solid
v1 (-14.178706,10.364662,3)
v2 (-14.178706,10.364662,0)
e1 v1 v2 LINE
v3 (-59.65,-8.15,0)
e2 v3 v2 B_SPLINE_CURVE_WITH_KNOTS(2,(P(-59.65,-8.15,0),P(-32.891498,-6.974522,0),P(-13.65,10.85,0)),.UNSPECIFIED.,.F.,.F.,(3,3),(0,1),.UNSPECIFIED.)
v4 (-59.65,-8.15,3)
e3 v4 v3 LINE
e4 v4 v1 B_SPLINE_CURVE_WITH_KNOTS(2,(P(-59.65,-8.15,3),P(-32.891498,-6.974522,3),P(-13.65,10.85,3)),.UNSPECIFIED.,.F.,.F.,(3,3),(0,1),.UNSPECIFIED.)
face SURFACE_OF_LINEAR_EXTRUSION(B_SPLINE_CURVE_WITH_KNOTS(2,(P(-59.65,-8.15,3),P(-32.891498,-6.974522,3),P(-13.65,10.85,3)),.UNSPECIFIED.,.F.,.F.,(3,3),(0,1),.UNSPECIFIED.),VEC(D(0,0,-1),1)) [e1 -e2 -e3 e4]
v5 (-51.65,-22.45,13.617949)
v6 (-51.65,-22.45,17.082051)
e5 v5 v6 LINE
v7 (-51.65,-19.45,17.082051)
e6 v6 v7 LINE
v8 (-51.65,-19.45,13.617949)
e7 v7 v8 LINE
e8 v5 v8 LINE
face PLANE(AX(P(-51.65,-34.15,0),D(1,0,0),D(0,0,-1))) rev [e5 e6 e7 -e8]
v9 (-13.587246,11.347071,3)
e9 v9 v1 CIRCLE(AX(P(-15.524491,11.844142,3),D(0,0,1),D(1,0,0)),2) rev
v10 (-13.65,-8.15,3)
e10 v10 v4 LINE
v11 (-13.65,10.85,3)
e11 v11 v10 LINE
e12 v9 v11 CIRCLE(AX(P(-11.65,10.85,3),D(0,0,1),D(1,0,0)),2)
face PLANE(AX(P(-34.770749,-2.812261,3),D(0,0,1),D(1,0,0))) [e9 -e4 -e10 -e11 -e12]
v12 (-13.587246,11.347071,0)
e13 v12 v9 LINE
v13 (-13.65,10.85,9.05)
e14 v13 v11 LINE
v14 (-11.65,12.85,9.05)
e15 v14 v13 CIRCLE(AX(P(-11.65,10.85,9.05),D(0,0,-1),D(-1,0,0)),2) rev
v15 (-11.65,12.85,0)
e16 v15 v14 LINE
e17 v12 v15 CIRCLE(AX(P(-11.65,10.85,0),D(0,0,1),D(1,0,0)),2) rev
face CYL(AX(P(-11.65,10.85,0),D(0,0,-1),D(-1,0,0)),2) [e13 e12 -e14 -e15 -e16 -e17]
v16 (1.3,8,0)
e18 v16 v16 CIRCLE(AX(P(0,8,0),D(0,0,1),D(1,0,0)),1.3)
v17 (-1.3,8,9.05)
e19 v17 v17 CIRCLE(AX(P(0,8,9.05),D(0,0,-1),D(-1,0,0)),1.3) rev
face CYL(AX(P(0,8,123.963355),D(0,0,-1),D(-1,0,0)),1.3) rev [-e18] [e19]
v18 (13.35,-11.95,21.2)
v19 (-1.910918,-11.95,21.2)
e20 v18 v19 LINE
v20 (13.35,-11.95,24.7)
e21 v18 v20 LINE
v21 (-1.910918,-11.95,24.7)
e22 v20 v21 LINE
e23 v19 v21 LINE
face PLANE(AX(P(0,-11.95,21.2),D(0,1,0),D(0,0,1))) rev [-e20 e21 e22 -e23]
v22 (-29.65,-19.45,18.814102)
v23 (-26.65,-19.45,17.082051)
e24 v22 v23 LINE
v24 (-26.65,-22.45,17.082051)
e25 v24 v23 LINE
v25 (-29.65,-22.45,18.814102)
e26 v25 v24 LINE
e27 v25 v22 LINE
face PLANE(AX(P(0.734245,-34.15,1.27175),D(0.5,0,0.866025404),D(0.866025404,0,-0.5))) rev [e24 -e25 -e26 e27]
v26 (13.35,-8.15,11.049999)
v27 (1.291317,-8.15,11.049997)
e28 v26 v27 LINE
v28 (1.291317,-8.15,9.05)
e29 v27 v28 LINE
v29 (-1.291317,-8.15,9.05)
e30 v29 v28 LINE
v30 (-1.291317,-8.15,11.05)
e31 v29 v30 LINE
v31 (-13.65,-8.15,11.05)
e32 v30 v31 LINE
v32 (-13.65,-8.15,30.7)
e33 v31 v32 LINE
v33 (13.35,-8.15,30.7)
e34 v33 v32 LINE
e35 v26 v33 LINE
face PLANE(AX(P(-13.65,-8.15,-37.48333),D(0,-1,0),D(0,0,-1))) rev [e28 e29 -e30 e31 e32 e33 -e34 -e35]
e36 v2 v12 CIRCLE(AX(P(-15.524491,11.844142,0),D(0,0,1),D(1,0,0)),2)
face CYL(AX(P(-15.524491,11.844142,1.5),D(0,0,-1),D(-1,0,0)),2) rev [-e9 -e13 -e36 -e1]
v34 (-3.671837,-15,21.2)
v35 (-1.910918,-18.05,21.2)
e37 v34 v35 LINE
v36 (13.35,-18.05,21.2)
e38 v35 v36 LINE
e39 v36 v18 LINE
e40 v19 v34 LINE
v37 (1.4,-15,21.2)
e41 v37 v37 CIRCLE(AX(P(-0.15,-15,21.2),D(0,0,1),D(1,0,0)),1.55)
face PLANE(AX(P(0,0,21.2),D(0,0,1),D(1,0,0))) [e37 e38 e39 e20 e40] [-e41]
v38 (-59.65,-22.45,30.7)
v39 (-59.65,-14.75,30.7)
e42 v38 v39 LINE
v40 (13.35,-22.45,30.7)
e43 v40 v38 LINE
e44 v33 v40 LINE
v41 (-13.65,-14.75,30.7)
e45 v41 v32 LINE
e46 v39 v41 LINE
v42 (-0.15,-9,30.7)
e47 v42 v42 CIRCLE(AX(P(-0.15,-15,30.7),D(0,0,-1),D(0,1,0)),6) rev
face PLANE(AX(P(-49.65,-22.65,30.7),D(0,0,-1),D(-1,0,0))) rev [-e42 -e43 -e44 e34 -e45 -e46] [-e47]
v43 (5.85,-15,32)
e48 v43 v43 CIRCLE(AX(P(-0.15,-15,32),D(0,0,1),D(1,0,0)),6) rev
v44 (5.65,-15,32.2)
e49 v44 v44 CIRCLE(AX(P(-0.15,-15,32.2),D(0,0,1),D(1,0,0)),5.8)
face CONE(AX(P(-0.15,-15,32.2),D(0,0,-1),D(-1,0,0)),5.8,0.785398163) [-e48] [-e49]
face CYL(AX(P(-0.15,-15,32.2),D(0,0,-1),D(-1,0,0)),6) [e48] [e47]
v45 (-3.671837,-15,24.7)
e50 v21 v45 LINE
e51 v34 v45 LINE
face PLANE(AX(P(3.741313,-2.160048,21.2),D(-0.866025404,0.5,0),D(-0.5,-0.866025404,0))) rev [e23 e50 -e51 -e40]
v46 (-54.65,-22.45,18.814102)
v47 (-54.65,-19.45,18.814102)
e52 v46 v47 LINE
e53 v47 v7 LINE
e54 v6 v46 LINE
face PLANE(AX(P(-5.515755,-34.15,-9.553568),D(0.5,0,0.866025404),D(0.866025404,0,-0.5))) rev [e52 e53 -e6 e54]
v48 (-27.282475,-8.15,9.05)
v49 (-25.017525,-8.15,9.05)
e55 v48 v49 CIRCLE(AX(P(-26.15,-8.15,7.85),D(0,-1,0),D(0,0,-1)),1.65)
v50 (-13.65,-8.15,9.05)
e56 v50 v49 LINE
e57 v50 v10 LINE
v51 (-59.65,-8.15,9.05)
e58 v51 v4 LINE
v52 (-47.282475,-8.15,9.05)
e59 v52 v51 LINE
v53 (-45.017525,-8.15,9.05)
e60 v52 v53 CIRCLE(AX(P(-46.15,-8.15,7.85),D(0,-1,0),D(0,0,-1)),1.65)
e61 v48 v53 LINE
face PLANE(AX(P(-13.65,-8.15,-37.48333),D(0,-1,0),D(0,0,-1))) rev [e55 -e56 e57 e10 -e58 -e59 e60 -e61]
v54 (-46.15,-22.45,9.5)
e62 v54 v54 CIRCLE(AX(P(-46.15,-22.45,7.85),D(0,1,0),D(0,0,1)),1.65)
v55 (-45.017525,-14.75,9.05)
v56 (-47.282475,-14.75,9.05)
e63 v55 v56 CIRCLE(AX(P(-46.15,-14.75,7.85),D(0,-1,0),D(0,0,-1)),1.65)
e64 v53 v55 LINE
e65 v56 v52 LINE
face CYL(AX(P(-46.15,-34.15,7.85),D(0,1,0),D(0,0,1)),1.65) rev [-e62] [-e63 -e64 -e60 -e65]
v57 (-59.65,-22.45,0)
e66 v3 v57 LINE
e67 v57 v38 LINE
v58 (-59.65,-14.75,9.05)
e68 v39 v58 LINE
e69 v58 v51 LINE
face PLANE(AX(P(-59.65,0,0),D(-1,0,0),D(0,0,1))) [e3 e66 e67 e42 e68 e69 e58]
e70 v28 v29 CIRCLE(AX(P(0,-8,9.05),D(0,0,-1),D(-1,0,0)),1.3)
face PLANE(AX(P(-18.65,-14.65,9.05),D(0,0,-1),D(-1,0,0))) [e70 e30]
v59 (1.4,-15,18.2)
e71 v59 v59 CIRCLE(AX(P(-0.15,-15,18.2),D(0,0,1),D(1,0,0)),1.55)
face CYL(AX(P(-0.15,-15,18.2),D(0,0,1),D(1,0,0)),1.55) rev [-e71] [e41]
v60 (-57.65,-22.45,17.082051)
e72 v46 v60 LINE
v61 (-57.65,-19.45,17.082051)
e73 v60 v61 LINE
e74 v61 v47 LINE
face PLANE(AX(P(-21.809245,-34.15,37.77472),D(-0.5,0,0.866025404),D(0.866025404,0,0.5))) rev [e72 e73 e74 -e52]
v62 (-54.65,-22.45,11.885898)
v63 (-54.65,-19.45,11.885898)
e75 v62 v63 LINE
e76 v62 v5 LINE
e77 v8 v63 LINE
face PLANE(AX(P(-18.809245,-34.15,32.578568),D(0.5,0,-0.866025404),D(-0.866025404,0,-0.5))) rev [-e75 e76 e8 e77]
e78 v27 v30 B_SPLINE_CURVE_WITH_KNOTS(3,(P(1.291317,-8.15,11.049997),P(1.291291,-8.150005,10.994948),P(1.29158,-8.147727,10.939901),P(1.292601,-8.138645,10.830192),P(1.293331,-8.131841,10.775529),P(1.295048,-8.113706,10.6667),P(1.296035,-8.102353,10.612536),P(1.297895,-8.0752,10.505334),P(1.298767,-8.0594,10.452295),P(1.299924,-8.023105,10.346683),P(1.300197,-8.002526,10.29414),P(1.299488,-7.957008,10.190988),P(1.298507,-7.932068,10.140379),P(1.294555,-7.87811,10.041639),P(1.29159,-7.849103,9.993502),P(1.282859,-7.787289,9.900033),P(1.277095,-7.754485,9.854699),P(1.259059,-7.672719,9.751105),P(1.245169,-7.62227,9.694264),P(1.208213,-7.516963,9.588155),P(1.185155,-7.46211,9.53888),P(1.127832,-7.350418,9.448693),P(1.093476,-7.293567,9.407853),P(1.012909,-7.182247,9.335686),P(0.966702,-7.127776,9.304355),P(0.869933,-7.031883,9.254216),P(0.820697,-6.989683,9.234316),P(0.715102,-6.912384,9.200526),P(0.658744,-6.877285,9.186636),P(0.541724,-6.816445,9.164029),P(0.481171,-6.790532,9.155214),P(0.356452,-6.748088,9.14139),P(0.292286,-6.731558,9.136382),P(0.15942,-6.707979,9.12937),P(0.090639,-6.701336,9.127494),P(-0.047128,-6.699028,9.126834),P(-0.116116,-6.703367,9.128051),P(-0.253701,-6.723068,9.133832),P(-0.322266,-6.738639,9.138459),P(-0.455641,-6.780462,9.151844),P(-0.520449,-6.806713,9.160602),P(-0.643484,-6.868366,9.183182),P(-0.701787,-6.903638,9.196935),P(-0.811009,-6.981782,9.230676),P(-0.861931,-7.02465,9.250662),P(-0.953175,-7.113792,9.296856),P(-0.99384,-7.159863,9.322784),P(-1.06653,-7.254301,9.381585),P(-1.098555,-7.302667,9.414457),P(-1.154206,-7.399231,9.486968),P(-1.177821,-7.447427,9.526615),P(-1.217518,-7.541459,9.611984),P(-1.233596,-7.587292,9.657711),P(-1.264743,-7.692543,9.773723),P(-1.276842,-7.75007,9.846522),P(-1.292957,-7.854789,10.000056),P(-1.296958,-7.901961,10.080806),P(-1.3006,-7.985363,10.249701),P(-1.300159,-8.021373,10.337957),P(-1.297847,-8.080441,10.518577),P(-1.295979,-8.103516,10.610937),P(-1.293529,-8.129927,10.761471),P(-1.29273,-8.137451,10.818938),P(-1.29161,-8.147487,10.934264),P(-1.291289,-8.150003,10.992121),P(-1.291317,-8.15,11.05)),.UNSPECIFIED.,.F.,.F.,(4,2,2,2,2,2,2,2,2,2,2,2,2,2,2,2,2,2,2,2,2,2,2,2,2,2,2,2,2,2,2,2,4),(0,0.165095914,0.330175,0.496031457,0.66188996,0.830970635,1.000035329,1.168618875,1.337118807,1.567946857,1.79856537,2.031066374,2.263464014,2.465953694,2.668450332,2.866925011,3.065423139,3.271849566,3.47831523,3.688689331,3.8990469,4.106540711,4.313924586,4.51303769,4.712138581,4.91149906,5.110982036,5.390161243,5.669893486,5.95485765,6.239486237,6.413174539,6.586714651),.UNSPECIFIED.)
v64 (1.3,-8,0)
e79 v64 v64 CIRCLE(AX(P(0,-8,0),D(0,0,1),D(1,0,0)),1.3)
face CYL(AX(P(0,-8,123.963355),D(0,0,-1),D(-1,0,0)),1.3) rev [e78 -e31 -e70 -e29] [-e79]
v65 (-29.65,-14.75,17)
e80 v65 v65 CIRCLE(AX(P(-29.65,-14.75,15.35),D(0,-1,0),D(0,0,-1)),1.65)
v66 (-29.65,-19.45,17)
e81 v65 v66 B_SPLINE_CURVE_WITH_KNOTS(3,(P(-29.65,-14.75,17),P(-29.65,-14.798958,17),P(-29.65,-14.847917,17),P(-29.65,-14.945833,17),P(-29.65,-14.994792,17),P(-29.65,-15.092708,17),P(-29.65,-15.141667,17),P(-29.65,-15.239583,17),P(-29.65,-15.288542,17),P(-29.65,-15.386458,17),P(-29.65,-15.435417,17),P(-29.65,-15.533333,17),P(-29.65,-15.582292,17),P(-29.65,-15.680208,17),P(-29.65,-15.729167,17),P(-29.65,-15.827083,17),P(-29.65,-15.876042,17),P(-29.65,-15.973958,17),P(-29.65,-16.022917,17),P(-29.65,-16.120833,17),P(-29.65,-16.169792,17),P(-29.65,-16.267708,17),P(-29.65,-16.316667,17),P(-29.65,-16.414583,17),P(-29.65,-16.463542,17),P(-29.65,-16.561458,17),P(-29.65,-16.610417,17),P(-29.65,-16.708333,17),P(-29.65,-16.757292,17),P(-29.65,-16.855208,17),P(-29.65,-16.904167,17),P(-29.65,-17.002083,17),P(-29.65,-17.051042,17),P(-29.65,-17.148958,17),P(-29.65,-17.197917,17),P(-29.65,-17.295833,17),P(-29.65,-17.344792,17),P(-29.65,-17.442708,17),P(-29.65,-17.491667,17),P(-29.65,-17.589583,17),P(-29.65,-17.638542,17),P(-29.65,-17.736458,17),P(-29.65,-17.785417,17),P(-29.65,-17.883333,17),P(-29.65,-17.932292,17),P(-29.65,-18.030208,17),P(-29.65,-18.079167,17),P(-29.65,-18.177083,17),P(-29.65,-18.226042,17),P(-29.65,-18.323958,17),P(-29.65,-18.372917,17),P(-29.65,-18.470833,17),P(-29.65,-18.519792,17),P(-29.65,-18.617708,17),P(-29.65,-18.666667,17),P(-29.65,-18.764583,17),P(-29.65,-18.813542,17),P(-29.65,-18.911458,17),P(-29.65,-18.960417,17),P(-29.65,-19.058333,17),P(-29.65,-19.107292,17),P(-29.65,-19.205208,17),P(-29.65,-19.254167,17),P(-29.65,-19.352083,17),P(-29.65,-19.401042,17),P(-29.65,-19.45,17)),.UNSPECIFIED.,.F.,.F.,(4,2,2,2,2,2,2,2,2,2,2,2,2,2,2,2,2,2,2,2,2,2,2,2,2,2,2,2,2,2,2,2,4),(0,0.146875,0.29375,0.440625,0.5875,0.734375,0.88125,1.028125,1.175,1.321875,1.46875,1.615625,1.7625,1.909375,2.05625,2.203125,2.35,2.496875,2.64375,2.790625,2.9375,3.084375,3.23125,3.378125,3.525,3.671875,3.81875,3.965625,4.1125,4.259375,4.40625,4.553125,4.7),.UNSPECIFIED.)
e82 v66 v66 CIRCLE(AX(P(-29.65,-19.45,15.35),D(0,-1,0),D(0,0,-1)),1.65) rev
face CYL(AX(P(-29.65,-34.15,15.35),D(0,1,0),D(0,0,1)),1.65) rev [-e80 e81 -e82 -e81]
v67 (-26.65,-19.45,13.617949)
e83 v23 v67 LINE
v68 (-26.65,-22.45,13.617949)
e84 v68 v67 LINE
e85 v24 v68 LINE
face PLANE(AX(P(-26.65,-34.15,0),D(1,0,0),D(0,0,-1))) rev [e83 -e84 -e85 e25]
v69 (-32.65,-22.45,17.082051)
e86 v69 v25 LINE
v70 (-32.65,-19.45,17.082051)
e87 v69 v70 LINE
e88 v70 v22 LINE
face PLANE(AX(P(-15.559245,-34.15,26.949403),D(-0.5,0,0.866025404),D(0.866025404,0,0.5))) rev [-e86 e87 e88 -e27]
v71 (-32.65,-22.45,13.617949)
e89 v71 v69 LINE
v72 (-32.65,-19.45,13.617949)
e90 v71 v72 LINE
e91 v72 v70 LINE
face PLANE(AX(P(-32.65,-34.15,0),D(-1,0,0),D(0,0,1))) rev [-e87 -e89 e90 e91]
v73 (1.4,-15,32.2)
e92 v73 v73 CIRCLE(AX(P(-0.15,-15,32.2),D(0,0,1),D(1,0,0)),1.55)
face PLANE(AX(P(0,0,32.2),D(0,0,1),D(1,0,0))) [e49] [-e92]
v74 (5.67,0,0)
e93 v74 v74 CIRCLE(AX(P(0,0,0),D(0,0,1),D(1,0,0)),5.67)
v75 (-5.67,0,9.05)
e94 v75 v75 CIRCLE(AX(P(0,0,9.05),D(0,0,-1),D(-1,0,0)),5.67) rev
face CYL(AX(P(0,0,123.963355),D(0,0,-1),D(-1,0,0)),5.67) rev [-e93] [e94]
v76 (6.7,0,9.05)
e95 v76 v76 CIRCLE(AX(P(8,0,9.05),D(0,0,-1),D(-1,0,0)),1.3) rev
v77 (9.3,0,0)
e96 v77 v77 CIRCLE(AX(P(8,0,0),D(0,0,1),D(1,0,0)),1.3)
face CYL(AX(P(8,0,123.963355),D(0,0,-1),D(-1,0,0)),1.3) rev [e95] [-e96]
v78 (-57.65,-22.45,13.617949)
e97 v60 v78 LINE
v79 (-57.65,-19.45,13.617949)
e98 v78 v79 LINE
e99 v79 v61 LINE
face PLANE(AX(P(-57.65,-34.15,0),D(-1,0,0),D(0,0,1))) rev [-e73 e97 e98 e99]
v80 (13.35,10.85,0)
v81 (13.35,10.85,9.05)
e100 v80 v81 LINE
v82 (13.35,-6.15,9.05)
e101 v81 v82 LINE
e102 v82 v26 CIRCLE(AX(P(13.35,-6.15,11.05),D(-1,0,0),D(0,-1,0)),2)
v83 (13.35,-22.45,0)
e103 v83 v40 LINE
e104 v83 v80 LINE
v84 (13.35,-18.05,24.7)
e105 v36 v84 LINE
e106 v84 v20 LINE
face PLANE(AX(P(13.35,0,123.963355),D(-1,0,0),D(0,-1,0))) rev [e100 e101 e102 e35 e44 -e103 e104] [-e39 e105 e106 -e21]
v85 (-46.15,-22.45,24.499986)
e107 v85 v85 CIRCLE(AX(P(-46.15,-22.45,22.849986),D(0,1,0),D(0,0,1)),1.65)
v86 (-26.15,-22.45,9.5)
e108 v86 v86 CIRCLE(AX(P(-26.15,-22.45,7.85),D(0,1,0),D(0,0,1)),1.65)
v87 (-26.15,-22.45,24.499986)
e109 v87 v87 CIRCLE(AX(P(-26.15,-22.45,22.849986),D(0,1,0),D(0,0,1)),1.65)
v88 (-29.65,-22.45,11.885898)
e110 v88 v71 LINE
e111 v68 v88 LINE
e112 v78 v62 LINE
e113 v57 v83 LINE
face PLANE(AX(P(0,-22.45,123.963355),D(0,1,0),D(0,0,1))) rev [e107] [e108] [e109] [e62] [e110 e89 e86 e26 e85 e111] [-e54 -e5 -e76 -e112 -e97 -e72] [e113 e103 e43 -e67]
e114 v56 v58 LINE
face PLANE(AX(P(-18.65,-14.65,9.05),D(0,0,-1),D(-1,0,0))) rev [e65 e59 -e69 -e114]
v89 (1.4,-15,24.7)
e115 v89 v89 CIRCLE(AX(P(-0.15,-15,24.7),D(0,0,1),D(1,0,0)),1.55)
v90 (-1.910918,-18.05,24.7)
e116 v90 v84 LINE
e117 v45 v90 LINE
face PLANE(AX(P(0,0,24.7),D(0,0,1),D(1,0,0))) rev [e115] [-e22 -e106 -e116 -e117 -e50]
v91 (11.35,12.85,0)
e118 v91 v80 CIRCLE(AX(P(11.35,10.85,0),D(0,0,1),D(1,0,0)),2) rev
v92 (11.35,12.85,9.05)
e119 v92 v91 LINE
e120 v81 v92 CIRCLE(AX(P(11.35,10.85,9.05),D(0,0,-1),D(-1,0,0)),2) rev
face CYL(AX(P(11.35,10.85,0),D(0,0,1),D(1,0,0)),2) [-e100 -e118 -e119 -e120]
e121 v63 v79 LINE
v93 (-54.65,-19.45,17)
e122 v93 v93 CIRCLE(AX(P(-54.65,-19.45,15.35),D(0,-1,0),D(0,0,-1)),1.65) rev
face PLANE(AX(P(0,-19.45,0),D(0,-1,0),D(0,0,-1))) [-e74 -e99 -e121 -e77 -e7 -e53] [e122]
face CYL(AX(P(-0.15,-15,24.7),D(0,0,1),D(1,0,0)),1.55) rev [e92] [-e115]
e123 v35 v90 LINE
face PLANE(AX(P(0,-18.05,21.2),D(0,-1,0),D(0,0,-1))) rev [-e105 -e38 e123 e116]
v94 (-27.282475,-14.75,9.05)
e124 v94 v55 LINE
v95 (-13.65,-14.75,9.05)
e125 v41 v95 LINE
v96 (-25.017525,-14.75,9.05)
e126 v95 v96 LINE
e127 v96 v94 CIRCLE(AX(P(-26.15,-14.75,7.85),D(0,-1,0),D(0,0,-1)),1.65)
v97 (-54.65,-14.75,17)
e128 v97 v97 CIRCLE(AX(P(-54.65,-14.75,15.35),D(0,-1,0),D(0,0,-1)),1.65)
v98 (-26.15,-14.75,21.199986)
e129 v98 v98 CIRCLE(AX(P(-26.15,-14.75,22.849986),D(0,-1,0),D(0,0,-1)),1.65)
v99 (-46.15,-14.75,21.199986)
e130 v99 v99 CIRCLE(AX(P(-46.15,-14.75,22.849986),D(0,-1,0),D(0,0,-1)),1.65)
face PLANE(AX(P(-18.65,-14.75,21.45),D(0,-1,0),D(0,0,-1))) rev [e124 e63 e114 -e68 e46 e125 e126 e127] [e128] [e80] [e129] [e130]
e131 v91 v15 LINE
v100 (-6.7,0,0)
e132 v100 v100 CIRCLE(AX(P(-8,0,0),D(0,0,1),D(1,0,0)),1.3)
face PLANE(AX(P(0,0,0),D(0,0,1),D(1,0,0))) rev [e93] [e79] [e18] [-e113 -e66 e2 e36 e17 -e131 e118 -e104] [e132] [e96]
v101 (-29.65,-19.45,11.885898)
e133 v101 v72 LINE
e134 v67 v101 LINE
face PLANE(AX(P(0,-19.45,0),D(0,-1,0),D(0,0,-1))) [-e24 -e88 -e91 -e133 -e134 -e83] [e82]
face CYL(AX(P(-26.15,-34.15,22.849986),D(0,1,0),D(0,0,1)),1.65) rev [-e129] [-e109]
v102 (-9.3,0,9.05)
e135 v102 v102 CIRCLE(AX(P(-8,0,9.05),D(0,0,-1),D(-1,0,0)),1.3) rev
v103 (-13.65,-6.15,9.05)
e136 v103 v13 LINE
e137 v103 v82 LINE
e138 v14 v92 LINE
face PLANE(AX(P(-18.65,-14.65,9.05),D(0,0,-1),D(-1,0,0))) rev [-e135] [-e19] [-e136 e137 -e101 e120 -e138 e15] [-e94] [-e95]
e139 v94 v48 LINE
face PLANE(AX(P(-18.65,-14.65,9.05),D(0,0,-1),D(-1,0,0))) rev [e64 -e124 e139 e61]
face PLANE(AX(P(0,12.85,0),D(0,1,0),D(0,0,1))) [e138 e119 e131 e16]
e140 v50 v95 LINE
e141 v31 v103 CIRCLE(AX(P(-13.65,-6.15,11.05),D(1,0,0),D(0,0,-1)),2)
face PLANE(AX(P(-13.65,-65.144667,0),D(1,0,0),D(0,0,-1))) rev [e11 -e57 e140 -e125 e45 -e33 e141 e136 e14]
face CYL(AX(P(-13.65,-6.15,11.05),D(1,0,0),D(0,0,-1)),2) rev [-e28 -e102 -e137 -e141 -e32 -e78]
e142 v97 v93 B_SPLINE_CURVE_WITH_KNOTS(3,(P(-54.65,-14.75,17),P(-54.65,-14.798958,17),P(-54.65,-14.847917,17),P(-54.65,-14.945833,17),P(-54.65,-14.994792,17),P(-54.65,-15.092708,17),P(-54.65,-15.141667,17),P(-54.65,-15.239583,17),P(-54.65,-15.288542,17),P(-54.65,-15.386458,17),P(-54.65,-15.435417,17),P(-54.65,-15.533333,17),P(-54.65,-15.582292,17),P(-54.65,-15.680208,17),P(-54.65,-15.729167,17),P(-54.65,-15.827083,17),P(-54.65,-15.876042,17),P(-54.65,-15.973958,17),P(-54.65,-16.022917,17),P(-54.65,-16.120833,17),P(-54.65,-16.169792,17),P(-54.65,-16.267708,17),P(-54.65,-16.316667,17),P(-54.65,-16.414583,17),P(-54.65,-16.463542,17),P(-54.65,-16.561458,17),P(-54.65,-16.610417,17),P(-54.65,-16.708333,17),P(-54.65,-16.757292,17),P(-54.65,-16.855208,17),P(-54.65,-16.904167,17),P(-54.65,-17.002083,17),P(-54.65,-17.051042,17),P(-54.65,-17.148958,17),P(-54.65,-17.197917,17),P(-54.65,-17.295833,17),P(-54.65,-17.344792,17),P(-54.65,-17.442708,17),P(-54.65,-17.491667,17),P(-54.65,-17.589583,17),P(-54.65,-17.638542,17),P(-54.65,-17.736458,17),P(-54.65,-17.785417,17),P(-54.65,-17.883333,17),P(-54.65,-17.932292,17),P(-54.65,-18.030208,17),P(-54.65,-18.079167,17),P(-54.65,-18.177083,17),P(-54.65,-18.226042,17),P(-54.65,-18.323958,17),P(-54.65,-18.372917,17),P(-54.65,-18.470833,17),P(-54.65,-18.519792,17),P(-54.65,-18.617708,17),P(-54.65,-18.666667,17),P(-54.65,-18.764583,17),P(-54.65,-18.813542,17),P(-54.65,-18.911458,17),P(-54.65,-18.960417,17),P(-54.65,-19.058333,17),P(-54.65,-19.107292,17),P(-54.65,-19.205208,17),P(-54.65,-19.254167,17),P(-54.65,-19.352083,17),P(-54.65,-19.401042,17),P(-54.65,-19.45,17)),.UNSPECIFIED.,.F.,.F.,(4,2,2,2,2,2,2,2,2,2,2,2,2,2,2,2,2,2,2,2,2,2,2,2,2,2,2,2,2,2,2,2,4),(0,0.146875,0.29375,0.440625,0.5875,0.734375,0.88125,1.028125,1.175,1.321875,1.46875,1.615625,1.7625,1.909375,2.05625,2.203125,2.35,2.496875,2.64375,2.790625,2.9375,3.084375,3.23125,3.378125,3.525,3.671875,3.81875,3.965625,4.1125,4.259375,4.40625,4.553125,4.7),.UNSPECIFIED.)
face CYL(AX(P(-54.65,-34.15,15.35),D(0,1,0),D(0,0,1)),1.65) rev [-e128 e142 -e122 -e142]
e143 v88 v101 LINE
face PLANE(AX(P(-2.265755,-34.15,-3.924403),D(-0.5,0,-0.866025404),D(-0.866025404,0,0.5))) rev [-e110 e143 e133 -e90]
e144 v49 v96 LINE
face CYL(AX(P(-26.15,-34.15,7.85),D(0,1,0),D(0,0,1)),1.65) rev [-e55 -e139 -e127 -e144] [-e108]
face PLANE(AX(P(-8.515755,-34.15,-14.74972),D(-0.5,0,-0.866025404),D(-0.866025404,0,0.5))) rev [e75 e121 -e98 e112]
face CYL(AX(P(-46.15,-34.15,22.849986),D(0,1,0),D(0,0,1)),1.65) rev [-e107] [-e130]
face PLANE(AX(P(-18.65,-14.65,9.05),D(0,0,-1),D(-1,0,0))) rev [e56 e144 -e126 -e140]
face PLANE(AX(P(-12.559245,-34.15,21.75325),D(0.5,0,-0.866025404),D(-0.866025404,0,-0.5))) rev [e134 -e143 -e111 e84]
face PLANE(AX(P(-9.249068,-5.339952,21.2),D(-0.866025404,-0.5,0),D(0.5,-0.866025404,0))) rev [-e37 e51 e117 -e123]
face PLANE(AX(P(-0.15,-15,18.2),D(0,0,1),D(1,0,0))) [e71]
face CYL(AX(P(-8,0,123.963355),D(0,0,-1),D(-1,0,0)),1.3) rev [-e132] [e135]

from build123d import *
from build123d.topology import SkipClean

# Parameters (mm, degrees)
CROQUIS2_R                  = 10.875
CROQUIS2_R_2                = 5.67
CROQUIS2_R_3                = 1.6
CROQUIS2_R_4                = 1.3
SALIENTE_EXTRUIR1_DEPTH     = 30.7
CROQUIS4_W                  = 27
CROQUIS4_H                  = 26
CORTAR_EXTRUIR2_DEPTH       = 22.7
CORTAR_EXTRUIR5_DEPTH       = 43
CROQUIS5_R                  = 1.65
CORTAR_EXTRUIR6_DEPTH       = 87.297233443
CORTAR_EXTRUIR7_REACH       = 88.297
CROQUIS7_W                  = 48
CROQUIS7_H                  = 15.35
CORTAR_EXTRUIR21_DEPTH      = 32.6
CORTAR_EXTRUIR9_DEPTH       = 3
CORTAR_EXTRUIR9_DEPTH_BACK  = 80.795378939
CORTAR_EXTRUIR10_DEPTH      = 80.795378939
CORTAR_EXTRUIR10_DEPTH_BACK = 80.795378939
CROQUIS11_3_R               = 1.65
CORTAR_EXTRUIR22_START      = -5
CROQUIS19_W                 = 6.3
CROQUIS19_H                 = 6.6
CORTAR_EXTRUIR22_DEPTH      = 5
CROQUIS20_R                 = 1.3
CROQUIS20_R_2               = 5.67
SALIENTE_EXTRUIR2_DEPTH     = 1.05
SALIENTE_EXTRUIR4_START     = -21.65
SALIENTE_EXTRUIR4_DEPTH     = 21.65
CROQUIS21_R                 = 1.55
CORTAR_EXTRUIR14_DEPTH      = 6
CORTAR_EXTRUIR15_START      = -6
CROQUIS21_4_R               = 1.55
CORTAR_EXTRUIR15_DEPTH      = 3.5
CORTAR_EXTRUIR16_START      = -12.5
CROQUIS21_5_R               = 1.55
CORTAR_EXTRUIR16_DEPTH      = 3
CROQUIS21_6_R               = 1.55
SALIENTE_EXTRUIR3_DEPTH     = 1.5
CHAFL_N1_SIZE               = 0.2
CROQUIS23_W                 = 75
CROQUIS23_H                 = 30.7
CORTAR_EXTRUIR17_DEPTH      = 11.7
CROQUIS25_W                 = 27
CROQUIS25_H                 = 9.05
CORTAR_EXTRUIR19_DEPTH      = 5
CORTAR_EXTRUIR20_DEPTH      = 2
SALIENTE_EXTRUIR5_DEPTH     = 3
REDONDEO1_START             = -1
REDONDEO1_DEPTH             = 11
REDONDEO2_START             = -13.65
REDONDEO2_DEPTH             = 12.349993706
REDONDEO2_START_2           = 1.300000703
REDONDEO2_2_DEPTH           = 12.049999297
REDONDEO2_START_3           = -1.300006294
REDONDEO2_3_DEPTH           = 2.600006997
REDONDEO2_START_4           = 9.05
REDONDEO2_4_DEPTH           = 2
REDONDEO3_R                 = 2


with BuildPart() as part:
    # Croquis2 → Saliente-Extruir1 (new body)
    # profile 1 of 6: a face of its own
    with BuildSketch(Plane.XY):
        Polygon((-61.65, 17.85), (-61.65, -34.15), (-50.65, -34.15), (-50.65, -32.65), (-50.65, -22.65), (-50.65, -22.45), (-49.65, -22.45), (-22.65, -22.45), (-21.65, -22.45), (-21.65, -22.65), (-21.65, -32.65), (-21.65, -34.15), (13.35, -34.15), (13.35, 17.85), align=None)
        Circle(CROQUIS2_R, mode=Mode.SUBTRACT)
    # profile 2 of 6: a face of its own
    with BuildSketch(Plane.XY):
        Circle(CROQUIS2_R)
        with Locations(Location((0, 0, 0), (0, 0, 90))):
            Circle(CROQUIS2_R_2, mode=Mode.SUBTRACT)
        with Locations((0, -8)):
            Circle(CROQUIS2_R_3, mode=Mode.SUBTRACT)
        with Locations((-8, 0)):
            Circle(CROQUIS2_R_3, mode=Mode.SUBTRACT)
        with Locations((8, 0)):
            Circle(CROQUIS2_R_3, mode=Mode.SUBTRACT)
        with Locations((0, 8)):
            Circle(CROQUIS2_R_3, mode=Mode.SUBTRACT)
    # profile 3 of 6: a face of its own
    with BuildSketch(Plane.XY):
        with Locations((0, 8)):
            Circle(CROQUIS2_R_3)
        with Locations(Location((0, 8, 0), (0, 0, 90))):
            Circle(CROQUIS2_R_4, mode=Mode.SUBTRACT)
    # profile 4 of 6: a face of its own
    with BuildSketch(Plane.XY):
        with Locations((8, 0)):
            Circle(CROQUIS2_R_3)
        with Locations(Location((8, 0, 0), (0, 0, 90))):
            Circle(CROQUIS2_R_4, mode=Mode.SUBTRACT)
    # profile 5 of 6: a face of its own
    with BuildSketch(Plane.XY):
        with Locations((0, -8)):
            Circle(CROQUIS2_R_3)
        with Locations(Location((0, -8, 0), (0, 0, 90))):
            Circle(CROQUIS2_R_4, mode=Mode.SUBTRACT)
    # profile 6 of 6: a face of its own
    with BuildSketch(Plane.XY):
        with Locations((-8, 0)):
            Circle(CROQUIS2_R_3)
        with Locations(Location((-8, 0, 0), (0, 0, 90))):
            Circle(CROQUIS2_R_4, mode=Mode.SUBTRACT)
    extrude(amount=SALIENTE_EXTRUIR1_DEPTH)

    # Croquis4 → Cortar-Extruir2 (cut)
    with BuildSketch(Plane.XY.offset(30.7)):
        with Locations((-0.15, 4.85)):
            Rectangle(CROQUIS4_W, CROQUIS4_H)
    extrude(amount=-CORTAR_EXTRUIR2_DEPTH, mode=Mode.SUBTRACT)

    # Croquis3 → Cortar-Extruir5 (cut)
    with BuildSketch(Plane.ZY.offset(61.65)):
        Polygon((9.05, -6.55), (9.05, -14.65), (9.05, -14.75), (9.25, -14.75), (21.45, -14.75), (21.65, -14.75), (21.65, -6.55), (21.45, -6.55), (9.25, -6.55), align=None)
    extrude(amount=-CORTAR_EXTRUIR5_DEPTH, mode=Mode.SUBTRACT)

    # Croquis5 → Cortar-Extruir6 (cut, through all)
    with BuildSketch(Plane(origin=(0, 17.85, 0), x_dir=(1, 0, 0), z_dir=(0, 1, 0))):
        with Locations(Location((-54.65, -15.35, 0), (0, 0, 270))):
            Circle(CROQUIS5_R)
        with Locations(Location((-29.65, -15.35, 0), (0, 0, 270))):
            Circle(CROQUIS5_R)
    extrude(amount=-CORTAR_EXTRUIR6_DEPTH, mode=Mode.SUBTRACT)

    # Cortar-Extruir7: up to this face of the body (flat: up to its plane)
    cortar_extruir7_end = Plane(part.part.faces().sort_by_distance((-7.470658579, -8.15, 19.35))[0])
    # Croquis7 → Cortar-Extruir7 (cut, up to the picked face)
    with BuildSketch(Plane(origin=(0, 17.85, 0), x_dir=(1, 0, 0), z_dir=(0, 1, 0)), mode=Mode.PRIVATE) as cortar_extruir7_sk1:
        with Locations((-37.65, -7.675)):
            Rectangle(CROQUIS7_W, CROQUIS7_H)
    cortar_extruir7_tool1 = split(extrude(cortar_extruir7_sk1.sketch, amount=-CORTAR_EXTRUIR7_REACH, mode=Mode.PRIVATE), bisect_by=cortar_extruir7_end, keep=Keep.BOTH, mode=Mode.PRIVATE)
    add(cortar_extruir7_tool1.solids().sort_by(Axis((-37.65, 17.85, 7.675), (0, -1, 0)))[0], mode=Mode.SUBTRACT)

    # Croquis7<4> → Cortar-Extruir21 (cut)
    with BuildSketch(Plane(origin=(0, 17.85, 0), x_dir=(1, 0, 0), z_dir=(0, 1, 0))):
        with BuildLine():
            Line((-61.65, -20.85), (-61.65, -30.7))
            Line((-61.65, -30.7), (-13.65, -30.7))
            Line((-13.65, -30.7), (-13.65, -20.85))
            Line((-13.65, -20.85), (-13.65, -15.35))
            Line((-13.65, -15.35), (-28, -15.35))
            ThreePointArc((-28, -15.35), (-29.65, -17), (-31.3, -15.35))
            Line((-31.3, -15.35), (-53, -15.35))
            ThreePointArc((-53, -15.35), (-54.65, -17), (-56.3, -15.35))
            Line((-56.3, -15.35), (-61.65, -15.35))
            Line((-61.65, -15.35), (-61.65, -20.85))
        make_face()
    extrude(amount=-CORTAR_EXTRUIR21_DEPTH, mode=Mode.SUBTRACT)

    # Croquis11 → Cortar-Extruir9 (cut, two sides: drawn at the far end of the back side and taken through both)
    with BuildSketch(Plane(origin=(0, -22.45, 0), x_dir=(1, 0, 0), z_dir=(0, 1, 0)).offset(-CORTAR_EXTRUIR9_DEPTH_BACK)):
        Polygon((-51.65, -13.617949192), (-54.65, -11.885898385), (-57.65, -13.617949192), (-57.65, -17.082050808), (-54.65, -18.814101615), (-51.65, -17.082050808), align=None)
        Polygon((-26.65, -13.617949192), (-29.65, -11.885898385), (-32.65, -13.617949192), (-32.65, -17.082050808), (-29.65, -18.814101615), (-26.65, -17.082050808), align=None)
    extrude(amount=CORTAR_EXTRUIR9_DEPTH + CORTAR_EXTRUIR9_DEPTH_BACK, mode=Mode.SUBTRACT)

    # Croquis11<3> → Cortar-Extruir10 (cut, two sides: drawn at the far end of the back side and taken through both)
    with BuildSketch(Plane(origin=(0, -22.45, 0), x_dir=(1, 0, 0), z_dir=(0, 1, 0)).offset(-CORTAR_EXTRUIR10_DEPTH_BACK)):
        with Locations(Location((-46.15, -7.85, 0), (0, 0, 270))):
            Circle(CROQUIS11_3_R)
        with Locations(Location((-26.15, -7.85, 0), (0, 0, 270))):
            Circle(CROQUIS11_3_R)
        with Locations(Location((-26.15, -22.849986467, 0), (0, 0, 270))):
            Circle(CROQUIS11_3_R)
        with Locations(Location((-46.15, -22.849986467, 0), (0, 0, 270))):
            Circle(CROQUIS11_3_R)
    extrude(amount=CORTAR_EXTRUIR10_DEPTH + CORTAR_EXTRUIR10_DEPTH_BACK, mode=Mode.SUBTRACT)

    # Croquis19 → Cortar-Extruir22 (cut)
    with BuildSketch(Plane.ZY.offset(18.65).offset(CORTAR_EXTRUIR22_START)):
        with Locations((12.2, -11.45)):
            Rectangle(CROQUIS19_W, CROQUIS19_H)
    extrude(amount=CORTAR_EXTRUIR22_DEPTH, mode=Mode.SUBTRACT)

    # Croquis20 → Saliente-Extruir2 (add)
    with SkipClean():  # the faces are left unmerged after this step: merging them gives an invalid solid
        with BuildSketch(Plane.XY.offset(8)):
            with BuildLine():
                Line((-13.65, -8.15), (-1.291317157, -8.15))
                ThreePointArc((-1.291317157, -8.15), (0, -6.7), (1.291317157, -8.15))
                Line((1.291317157, -8.15), (13.35, -8.15))
                Line((13.35, -8.15), (13.35, 17.85))
                Line((13.35, 17.85), (-13.65, 17.85))
                Line((-13.65, 17.85), (-13.65, -8.15))
            make_face()
            with Locations(Location((-8, 0, 0), (0, 0, 180))):
                Circle(CROQUIS20_R, mode=Mode.SUBTRACT)
            with Locations(Location((8, 0, 0), (0, 0, 180))):
                Circle(CROQUIS20_R, mode=Mode.SUBTRACT)
            with Locations(Location((0, 8, 0), (0, 0, 180))):
                Circle(CROQUIS20_R, mode=Mode.SUBTRACT)
            with Locations(Location((0, 0, 0), (0, 0, 180))):
                Circle(CROQUIS20_R_2, mode=Mode.SUBTRACT)
        extrude(amount=SALIENTE_EXTRUIR2_DEPTH)

    # Croquis22 → Saliente-Extruir4 (add)
    with BuildSketch(Plane.XY.offset(30.7).offset(SALIENTE_EXTRUIR4_START)):
        with BuildLine():
            Line((-1.291317157, -8.15), (1.291317157, -8.15))
            ThreePointArc((1.291317157, -8.15), (0, -9.3), (-1.291317157, -8.15))
        make_face()
    extrude(amount=SALIENTE_EXTRUIR4_DEPTH)

    # Croquis21 → Cortar-Extruir14 (cut)
    with BuildSketch(Plane.XY.offset(30.7)):
        with Locations((-0.15, -15)):
            Circle(CROQUIS21_R)
    extrude(amount=-CORTAR_EXTRUIR14_DEPTH, mode=Mode.SUBTRACT)

    # Croquis21<4> → Cortar-Extruir15 (cut)
    # profile 1 of 4: a face of its own
    with BuildSketch(Plane.XY.offset(30.7).offset(CORTAR_EXTRUIR15_START)):
        Polygon((3.371836642, -15), (1.610918321, -11.95), (-1.910918321, -11.95), (-3.671836642, -15), (-1.910918321, -18.05), (1.610918321, -18.05), align=None)
        with Locations((-0.15, -15)):
            Circle(CROQUIS21_4_R, mode=Mode.SUBTRACT)
    # profile 2 of 4: a face of its own
    with BuildSketch(Plane.XY.offset(30.7).offset(CORTAR_EXTRUIR15_START)):
        with Locations((-0.15, -15)):
            Circle(CROQUIS21_4_R)
    # profile 3 of 4: a face of its own
    with BuildSketch(Plane.XY.offset(30.7).offset(CORTAR_EXTRUIR15_START)):
        with BuildLine():
            Line((13.35, -11.95), (5.016962357, -11.95))
            ThreePointArc((5.016962357, -11.95), (5.637995082, -13.419141711), (5.85, -15))
            ThreePointArc((5.85, -15), (5.637995082, -16.580858289), (5.016962357, -18.05))
            Line((5.016962357, -18.05), (13.35, -18.05))
            Line((13.35, -18.05), (13.35, -11.95))
        make_face()
    # profile 4 of 4: a face of its own
    with BuildSketch(Plane.XY.offset(30.7).offset(CORTAR_EXTRUIR15_START)):
        with BuildLine():
            Line((5.016962357, -11.95), (1.610918321, -11.95))
            Line((1.610918321, -11.95), (3.371836642, -15))
            Line((3.371836642, -15), (1.610918321, -18.05))
            Line((1.610918321, -18.05), (5.016962357, -18.05))
            ThreePointArc((5.016962357, -18.05), (5.637995082, -16.580858289), (5.85, -15))
            ThreePointArc((5.85, -15), (5.637995082, -13.419141711), (5.016962357, -11.95))
        make_face()
    extrude(amount=-CORTAR_EXTRUIR15_DEPTH, mode=Mode.SUBTRACT)

    # Croquis21<5> → Cortar-Extruir16 (cut)
    with BuildSketch(Plane.XY.offset(30.7).offset(CORTAR_EXTRUIR16_START)):
        with Locations((-0.15, -15)):
            Circle(CROQUIS21_5_R)
    extrude(amount=CORTAR_EXTRUIR16_DEPTH, mode=Mode.SUBTRACT)

    # Croquis21<6> → Saliente-Extruir3 (add)
    # profile 1 of 3: a face of its own
    with BuildSketch(Plane.XY.offset(30.7)):
        with BuildLine():
            Line((-1.910918321, -11.95), (1.610918321, -11.95))
            Line((1.610918321, -11.95), (5.016962357, -11.95))
            ThreePointArc((5.016962357, -11.95), (-6.15, -15), (5.016962357, -18.05))
            Line((5.016962357, -18.05), (1.610918321, -18.05))
            Line((1.610918321, -18.05), (-1.910918321, -18.05))
            Line((-1.910918321, -18.05), (-3.671836642, -15))
            Line((-3.671836642, -15), (-1.910918321, -11.95))
        make_face()
    # profile 2 of 3: a face of its own
    with BuildSketch(Plane.XY.offset(30.7)):
        with BuildLine():
            Line((5.016962357, -11.95), (1.610918321, -11.95))
            Line((1.610918321, -11.95), (3.371836642, -15))
            Line((3.371836642, -15), (1.610918321, -18.05))
            Line((1.610918321, -18.05), (5.016962357, -18.05))
            ThreePointArc((5.016962357, -18.05), (5.637995082, -16.580858289), (5.85, -15))
            ThreePointArc((5.85, -15), (5.637995082, -13.419141711), (5.016962357, -11.95))
        make_face()
    # profile 3 of 3: a face of its own
    with BuildSketch(Plane.XY.offset(30.7)):
        Polygon((3.371836642, -15), (1.610918321, -11.95), (-1.910918321, -11.95), (-3.671836642, -15), (-1.910918321, -18.05), (1.610918321, -18.05), align=None)
        with Locations((-0.15, -15)):
            Circle(CROQUIS21_6_R, mode=Mode.SUBTRACT)
    extrude(amount=SALIENTE_EXTRUIR3_DEPTH)

    # Chaflán1
    chafl_n1_edges = [part.edges().sort_by_distance(p)[0] for p in [
        (-5.316962357, -11.95, 32.2),
    ]]
    chamfer(chafl_n1_edges, length=CHAFL_N1_SIZE)

    # Croquis23 → Cortar-Extruir17 (cut)
    with BuildSketch(Plane.XZ.offset(34.15)):
        with Locations((-24.15, 15.35)):
            Rectangle(CROQUIS23_W, CROQUIS23_H)
    extrude(amount=-CORTAR_EXTRUIR17_DEPTH, mode=Mode.SUBTRACT)

    # Croquis25 → Cortar-Extruir19 (cut)
    with BuildSketch(Plane(origin=(0, 17.85, 0), x_dir=(1, 0, 0), z_dir=(0, 1, 0))):
        with Locations((-0.15, -4.525)):
            Rectangle(CROQUIS25_W, CROQUIS25_H)
    extrude(amount=-CORTAR_EXTRUIR19_DEPTH, mode=Mode.SUBTRACT)

    # Croquis26 → Cortar-Extruir20 (cut)
    with BuildSketch(Plane.ZY.offset(61.65)):
        Polygon((0, -22.45), (30.7, -22.45), (30.7, -14.75), (9.05, -14.75), (9.05, -8.15), (0, -8.15), align=None)
    extrude(amount=-CORTAR_EXTRUIR20_DEPTH, mode=Mode.SUBTRACT)

    # Croquis27 → Saliente-Extruir5 (add)
    with BuildSketch(Plane(origin=(0, 0, 0), x_dir=(-1, 0, 0), z_dir=(0, 0, -1))):
        with BuildLine():
            Line((13.65, -8.15), (13.65, 10.85))
            add(Edge.make_bspline(
                [(13.65, 10.85), (32.891497734, -6.974521578), (59.65, -8.15)],
                knots=[0, 0, 0, 1, 1, 1], degree=2))
            Line((59.65, -8.15), (13.65, -8.15))
        make_face()
    extrude(amount=-SALIENTE_EXTRUIR5_DEPTH)

    # Redondeo1: read off the stored shape, not the designer's step
    # Redondeo1 outline → Redondeo1 (cut)
    with BuildSketch(Plane.XY.offset(REDONDEO1_START)):
        with BuildLine():
            ThreePointArc((-13.65, 10.85), (-13.064213562, 12.264213562), (-11.65, 12.85))
            Line((-11.65, 12.85), (-13.65, 12.85))
            Line((-13.65, 12.85), (-13.65, 10.85))
        make_face()
        with BuildLine():
            ThreePointArc((11.35, 12.85), (12.764213562, 12.264213562), (13.35, 10.85))
            Line((13.35, 10.85), (13.35, 12.85))
            Line((13.35, 12.85), (11.35, 12.85))
        make_face()
    extrude(amount=REDONDEO1_DEPTH, mode=Mode.SUBTRACT)

    # Redondeo2: read off the stored shape, not the designer's step
    # Redondeo2 outline → Redondeo2 (add)
    with BuildSketch(Plane.YZ.offset(REDONDEO2_START)):
        with BuildLine():
            ThreePointArc((-6.15, 9.05), (-7.564213562, 9.635786438), (-8.15, 11.05))
            Line((-8.15, 11.05), (-8.15, 9.05))
            Line((-8.15, 9.05), (-6.15, 9.05))
        make_face()
    extrude(amount=REDONDEO2_DEPTH)

    # Redondeo2 2 outline → Redondeo2 2 (add)
    with BuildSketch(Plane.YZ.offset(REDONDEO2_START_2)):
        with BuildLine():
            ThreePointArc((-6.15, 9.05), (-7.564213562, 9.635786438), (-8.15, 11.05))
            Line((-8.15, 11.05), (-8.15, 9.05))
            Line((-8.15, 9.05), (-6.15, 9.05))
        make_face()
    extrude(amount=REDONDEO2_2_DEPTH)

    # Redondeo2 3 outline → Redondeo2 3 (add)
    with BuildSketch(Plane.YZ.offset(REDONDEO2_START_3)):
        with BuildLine():
            ThreePointArc((-6.15, 9.05), (-7.564213562, 9.635786438), (-8.15, 11.05))
            Line((-8.15, 11.05), (-8.15, 9.05))
            Line((-8.15, 9.05), (-6.15, 9.05))
        make_face()
    extrude(amount=REDONDEO2_3_DEPTH)

    # Redondeo2 4 outline → Redondeo2 4 (cut)
    with BuildSketch(Plane.XY.offset(REDONDEO2_START_4)):
        with BuildLine():
            ThreePointArc((1.291317157, -8.15), (0, -6.7), (-1.291317157, -8.15))
            Line((-1.291317157, -8.15), (1.291317157, -8.15))
        make_face()
    extrude(amount=REDONDEO2_4_DEPTH, mode=Mode.SUBTRACT)

    # Redondeo3
    # the kernel refuses this fillet: 2 mm, written as the material it adds along each edge
    with BuildSketch(Plane(origin=(-13.65, 10.85, 0), x_dir=(-0.7366744354008804, -0.6762475702187728, 0), z_dir=(0, 0, 1))) as redondeo3_piece_1:
        with BuildLine():
            CenterArc((0.708603199, -1.999979343), REDONDEO3_R, 89.739590275, 33.318429066)
            ThreePointArc((-0.382372835, -0.323742101), (-0.181008825, -0.173891837), (0, 0))
            ThreePointArc((0, 0), (0.358846588, 0.000814265), (0.717693182, 0))
        make_face()
    extrude(amount=3)


solid = part.part
